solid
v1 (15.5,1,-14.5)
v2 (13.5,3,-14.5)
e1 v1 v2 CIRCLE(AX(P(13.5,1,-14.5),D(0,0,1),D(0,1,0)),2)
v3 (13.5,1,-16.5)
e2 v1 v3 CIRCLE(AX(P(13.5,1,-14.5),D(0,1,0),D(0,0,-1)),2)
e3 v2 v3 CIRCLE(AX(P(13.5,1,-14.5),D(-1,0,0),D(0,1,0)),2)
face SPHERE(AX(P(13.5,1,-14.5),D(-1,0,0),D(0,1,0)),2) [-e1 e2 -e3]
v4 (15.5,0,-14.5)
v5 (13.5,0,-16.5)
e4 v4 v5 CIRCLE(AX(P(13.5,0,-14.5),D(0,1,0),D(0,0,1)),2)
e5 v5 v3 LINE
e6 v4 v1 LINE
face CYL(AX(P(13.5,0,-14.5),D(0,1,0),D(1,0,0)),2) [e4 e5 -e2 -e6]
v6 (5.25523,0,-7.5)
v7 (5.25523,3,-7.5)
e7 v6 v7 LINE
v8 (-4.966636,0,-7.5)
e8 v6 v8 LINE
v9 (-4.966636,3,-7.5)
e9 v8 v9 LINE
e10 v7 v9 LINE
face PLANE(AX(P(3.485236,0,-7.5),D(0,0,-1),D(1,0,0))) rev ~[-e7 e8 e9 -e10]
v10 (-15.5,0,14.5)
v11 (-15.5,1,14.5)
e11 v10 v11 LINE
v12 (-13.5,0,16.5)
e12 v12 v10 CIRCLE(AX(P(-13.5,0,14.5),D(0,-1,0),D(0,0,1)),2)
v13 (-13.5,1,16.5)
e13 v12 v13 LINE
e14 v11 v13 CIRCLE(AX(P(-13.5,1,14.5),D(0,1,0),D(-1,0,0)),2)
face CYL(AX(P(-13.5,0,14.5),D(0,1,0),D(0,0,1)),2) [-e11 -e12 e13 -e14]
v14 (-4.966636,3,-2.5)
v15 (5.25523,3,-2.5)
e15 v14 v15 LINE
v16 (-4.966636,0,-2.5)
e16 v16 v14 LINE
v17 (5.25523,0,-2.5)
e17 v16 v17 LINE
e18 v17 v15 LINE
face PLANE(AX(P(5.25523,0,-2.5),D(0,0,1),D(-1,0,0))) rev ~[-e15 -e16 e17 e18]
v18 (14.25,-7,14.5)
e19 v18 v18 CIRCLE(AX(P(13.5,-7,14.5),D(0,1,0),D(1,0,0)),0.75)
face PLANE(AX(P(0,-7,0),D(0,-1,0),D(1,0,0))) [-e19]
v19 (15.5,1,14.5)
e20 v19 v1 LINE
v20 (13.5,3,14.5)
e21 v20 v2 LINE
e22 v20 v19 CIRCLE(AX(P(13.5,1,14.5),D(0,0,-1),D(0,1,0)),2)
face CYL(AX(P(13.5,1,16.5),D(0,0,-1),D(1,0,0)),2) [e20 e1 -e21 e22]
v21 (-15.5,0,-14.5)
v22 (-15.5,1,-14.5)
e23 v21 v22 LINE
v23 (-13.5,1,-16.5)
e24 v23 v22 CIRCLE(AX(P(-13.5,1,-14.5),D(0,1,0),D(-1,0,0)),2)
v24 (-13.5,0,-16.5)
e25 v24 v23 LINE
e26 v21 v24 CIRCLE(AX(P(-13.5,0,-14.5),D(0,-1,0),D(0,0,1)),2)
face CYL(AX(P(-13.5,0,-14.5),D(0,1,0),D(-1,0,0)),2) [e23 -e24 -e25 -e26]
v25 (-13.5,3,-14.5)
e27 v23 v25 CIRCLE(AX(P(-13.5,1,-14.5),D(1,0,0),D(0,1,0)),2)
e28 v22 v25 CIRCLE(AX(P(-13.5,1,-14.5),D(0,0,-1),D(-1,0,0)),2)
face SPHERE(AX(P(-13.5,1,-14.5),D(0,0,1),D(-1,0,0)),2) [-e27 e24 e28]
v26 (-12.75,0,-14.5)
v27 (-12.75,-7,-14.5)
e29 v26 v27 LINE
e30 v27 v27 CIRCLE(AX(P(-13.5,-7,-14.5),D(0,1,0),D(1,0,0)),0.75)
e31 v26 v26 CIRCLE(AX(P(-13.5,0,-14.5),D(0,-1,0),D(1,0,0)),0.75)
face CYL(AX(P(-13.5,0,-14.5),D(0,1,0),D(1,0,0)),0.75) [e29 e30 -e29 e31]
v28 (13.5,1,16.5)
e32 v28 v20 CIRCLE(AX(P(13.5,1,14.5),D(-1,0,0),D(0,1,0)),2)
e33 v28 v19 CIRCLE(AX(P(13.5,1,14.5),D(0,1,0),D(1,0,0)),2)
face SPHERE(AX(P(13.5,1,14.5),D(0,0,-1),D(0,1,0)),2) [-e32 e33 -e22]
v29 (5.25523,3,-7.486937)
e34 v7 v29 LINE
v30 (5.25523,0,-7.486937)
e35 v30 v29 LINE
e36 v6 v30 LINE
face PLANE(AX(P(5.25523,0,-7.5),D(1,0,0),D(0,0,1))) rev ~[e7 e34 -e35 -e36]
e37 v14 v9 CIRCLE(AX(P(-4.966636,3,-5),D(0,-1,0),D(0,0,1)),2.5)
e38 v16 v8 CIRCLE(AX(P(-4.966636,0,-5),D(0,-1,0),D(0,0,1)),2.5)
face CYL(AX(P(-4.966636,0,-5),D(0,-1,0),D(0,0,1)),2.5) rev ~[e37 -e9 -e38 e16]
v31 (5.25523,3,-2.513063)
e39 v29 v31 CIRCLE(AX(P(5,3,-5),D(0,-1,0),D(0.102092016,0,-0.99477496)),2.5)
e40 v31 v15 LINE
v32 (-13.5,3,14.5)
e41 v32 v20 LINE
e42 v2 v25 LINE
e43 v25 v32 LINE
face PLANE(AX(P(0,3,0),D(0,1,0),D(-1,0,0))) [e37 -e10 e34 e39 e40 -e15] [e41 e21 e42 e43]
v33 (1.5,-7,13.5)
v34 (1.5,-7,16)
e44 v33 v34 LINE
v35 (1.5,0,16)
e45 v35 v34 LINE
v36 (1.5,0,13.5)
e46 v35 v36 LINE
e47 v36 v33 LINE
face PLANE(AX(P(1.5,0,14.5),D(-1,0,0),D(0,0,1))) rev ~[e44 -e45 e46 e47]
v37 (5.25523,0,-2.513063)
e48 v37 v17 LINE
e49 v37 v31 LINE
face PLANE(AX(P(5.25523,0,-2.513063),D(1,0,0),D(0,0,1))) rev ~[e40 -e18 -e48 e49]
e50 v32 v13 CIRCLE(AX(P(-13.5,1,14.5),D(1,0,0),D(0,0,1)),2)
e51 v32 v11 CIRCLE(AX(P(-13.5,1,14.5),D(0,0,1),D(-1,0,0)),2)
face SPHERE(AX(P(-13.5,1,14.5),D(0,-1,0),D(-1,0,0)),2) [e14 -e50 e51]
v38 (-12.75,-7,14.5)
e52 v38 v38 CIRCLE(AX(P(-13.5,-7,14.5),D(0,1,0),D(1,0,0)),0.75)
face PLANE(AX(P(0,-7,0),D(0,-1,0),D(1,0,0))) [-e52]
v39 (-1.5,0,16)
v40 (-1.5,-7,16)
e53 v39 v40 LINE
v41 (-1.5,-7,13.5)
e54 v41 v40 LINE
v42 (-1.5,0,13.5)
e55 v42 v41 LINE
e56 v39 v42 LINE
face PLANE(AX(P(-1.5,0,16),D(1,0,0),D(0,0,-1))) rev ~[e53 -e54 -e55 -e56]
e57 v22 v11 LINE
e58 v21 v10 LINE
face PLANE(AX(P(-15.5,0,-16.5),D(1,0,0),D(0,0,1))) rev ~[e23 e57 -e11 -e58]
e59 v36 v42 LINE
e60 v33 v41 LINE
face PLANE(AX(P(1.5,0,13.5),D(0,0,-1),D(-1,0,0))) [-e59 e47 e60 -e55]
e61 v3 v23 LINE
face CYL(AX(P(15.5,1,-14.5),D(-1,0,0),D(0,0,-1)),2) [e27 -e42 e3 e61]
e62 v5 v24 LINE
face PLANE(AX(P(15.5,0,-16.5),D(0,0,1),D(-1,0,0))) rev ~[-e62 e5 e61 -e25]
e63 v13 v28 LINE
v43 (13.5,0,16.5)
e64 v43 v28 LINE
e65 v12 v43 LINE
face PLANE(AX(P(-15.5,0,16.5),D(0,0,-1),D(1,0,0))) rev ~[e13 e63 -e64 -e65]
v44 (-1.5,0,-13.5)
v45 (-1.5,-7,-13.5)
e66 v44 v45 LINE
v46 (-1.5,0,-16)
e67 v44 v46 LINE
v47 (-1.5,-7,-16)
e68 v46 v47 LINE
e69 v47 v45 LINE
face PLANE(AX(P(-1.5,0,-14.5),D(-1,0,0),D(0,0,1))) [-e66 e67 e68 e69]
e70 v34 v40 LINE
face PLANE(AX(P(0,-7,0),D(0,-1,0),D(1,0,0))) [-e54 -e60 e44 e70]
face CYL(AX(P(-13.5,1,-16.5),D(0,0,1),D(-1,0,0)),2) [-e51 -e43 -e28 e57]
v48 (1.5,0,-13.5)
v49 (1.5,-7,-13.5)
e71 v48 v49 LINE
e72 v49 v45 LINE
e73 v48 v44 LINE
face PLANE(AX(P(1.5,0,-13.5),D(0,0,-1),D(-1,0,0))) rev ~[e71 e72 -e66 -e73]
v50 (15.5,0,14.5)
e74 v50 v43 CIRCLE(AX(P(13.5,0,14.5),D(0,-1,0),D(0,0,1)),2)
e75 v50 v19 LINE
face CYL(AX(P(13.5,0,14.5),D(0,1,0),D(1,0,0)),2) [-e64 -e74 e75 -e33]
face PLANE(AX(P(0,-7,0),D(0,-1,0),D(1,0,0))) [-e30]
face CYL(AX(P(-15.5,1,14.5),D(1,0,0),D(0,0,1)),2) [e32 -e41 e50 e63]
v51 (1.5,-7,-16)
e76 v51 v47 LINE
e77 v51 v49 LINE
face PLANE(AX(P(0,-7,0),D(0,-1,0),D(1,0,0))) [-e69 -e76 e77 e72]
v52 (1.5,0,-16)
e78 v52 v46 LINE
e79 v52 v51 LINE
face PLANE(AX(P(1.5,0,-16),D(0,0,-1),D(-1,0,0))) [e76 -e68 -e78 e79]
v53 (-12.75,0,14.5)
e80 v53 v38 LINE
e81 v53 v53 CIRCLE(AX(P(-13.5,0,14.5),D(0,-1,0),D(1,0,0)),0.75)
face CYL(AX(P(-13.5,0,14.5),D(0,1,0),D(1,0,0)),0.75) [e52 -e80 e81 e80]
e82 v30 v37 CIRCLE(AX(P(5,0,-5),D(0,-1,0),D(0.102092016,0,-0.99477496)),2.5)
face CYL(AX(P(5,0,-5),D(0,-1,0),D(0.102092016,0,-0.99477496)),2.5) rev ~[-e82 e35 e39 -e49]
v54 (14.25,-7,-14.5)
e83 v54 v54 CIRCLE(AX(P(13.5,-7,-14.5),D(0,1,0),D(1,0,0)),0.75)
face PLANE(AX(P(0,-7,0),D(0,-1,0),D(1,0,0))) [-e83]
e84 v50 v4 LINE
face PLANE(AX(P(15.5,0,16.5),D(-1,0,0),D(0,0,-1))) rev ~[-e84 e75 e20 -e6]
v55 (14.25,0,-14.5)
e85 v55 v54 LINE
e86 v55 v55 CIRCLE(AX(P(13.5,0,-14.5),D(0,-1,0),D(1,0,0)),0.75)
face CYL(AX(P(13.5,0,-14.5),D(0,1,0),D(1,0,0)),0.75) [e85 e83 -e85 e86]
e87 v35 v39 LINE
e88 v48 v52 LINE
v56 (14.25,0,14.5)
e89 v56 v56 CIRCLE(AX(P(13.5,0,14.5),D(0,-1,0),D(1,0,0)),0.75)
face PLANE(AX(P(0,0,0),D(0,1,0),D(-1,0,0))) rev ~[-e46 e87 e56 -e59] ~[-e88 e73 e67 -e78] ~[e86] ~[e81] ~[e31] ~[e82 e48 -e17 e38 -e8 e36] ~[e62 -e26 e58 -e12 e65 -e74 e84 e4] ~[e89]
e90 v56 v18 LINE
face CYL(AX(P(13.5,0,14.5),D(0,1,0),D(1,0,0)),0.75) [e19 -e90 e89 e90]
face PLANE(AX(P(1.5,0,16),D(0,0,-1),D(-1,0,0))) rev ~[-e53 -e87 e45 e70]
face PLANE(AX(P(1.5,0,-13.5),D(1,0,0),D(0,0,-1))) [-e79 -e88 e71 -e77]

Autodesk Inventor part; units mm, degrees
ref_plane "YZ Plane" through (0, 0, 0) normal (1, 0, 0) x (0, 1, 0)
ref_plane "XZ Plane" through (0, 0, 0) normal (0, 1, 0) x (-1, 0, 0)
ref_plane "XY Plane" through (0, 0, 0) normal (0, 0, 1) x (1, 0, 0)
sketch "Boceto1" plane through (0, 0, 0) normal (0, 1, 0) x (-1, 0, 0)
  line L0 (15.5, 16.5) -> (-15.5, 16.5)
  line L1 (-15.5, 16.5) -> (-15.5, -16.5)
  line L2 (-15.5, -16.5) -> (15.5, -16.5)
  line L3 (15.5, -16.5) -> (15.5, 16.5)
  line L4 (-15.5, 16.5) -> (15.5, -16.5) construction
  circle A0 centre (15.5, -16.5) radius 0
  line L5 (0, -20.441182) -> (0, -13.180985)
  circle A1 centre (-15.5, -16.5) radius 0
  line L6 (0, 0) -> (-6.703667, 0)
  circle A2 centre (15.5, 16.5) radius 0
  circle A3 centre (-15.5, 16.5) radius 0
  line L7 (-1.743284, -16.5) -> (-1.743284, -13.5)
  line L8 (-1.743284, -13.5) -> (-1.743284, 1.5)
  line L9 (-1.743284, 1.5) -> (-1.743284, 3.5)
  line L10 (-1.743284, 3.5) -> (-1.743284, 13.5)
  line L11 (-1.743284, 13.5) -> (-1.743284, 16.5)
  line L12 (15.5, 0) -> (12.5, 0)
  line L13 (12.5, 0) -> (-12.5, 0)
  line L14 (-12.5, 0) -> (-15.5, 0)
  line L15 (-0.653653, 1.5) -> (-0.653653, -3.5)
  line L16 (12.5, 0) -> (12.5, -5)
  line L17 (12.5, -5) -> (2.466636, -5)
  line L18 (-15.5, 0) -> (-15.5, -5)
  line L19 (-15.5, -5) -> (-12.5, -5)
  circle A4 centre (4.966636, -5) radius 2.5
  line L20 (0, -8.467064) -> (0, -3.5)
  line L21 (12.5, -5) -> (7.5, -5)
  line L22 (12.5, -5) -> (-15.5, -5)
  line L23 (-12.5, -5) -> (-7.5, -5)
  line L24 (-7.5, -5.492671) -> (-7.5, -4.332105)
  line L25 (-7.5, -7.321441) -> (-7.5, -3.5)
  line L26 (-7.5, -5) -> (-3.010459, -5)
  line L27 (-5.25523, -5) -> (-5.25523, -7.5)
  line L28 (-5.25523, -7.5) -> (-3.485236, -7.5)
  line L29 (-5.25523, -5) -> (-5.25523, -2.5)
  line L30 (-5.25523, -2.5) -> (-3.924845, -2.5)
  circle A5 centre (-5, -5) radius 2.5
  line L31 (4.966636, -7.5) -> (-5.25523, -7.5)
  line L32 (-5.25523, -2.5) -> (4.966636, -2.5)
  point P0 (-5.25523, -2.513063)
  point P1 (-5.25523, -7.486937)
  dimension "d0" = 31
  dimension "d1" = 33
  dimension "d3" = 3
  dimension "d4" = 15
  dimension "d5" = 2
  dimension "d6" = 10
  dimension "d7" = 3
  dimension "d8" = 3
  dimension "d9" = 25
  dimension "d10" = 3
  dimension "d11" = 5
  dimension "d12" = 5
  dimension "d14" = 5
  dimension "d15" = 3
  dimension "d16" = 5
  dimension "d17" = 5
  dimension "d19" = 5
  dimension "d21" = 2.5
  dimension "d22" = 2.5
sketch "Boceto1 outline for Extrusión1" plane through (0, 0, 0) normal (0, 1, 0) x (-1, 0, 0)
  line L0 (-15.5, -16.5) -> (15.5, -16.5)
  line L1 (-15.5, 16.5) -> (-15.5, -16.5)
  line L2 (15.5, -16.5) -> (15.5, 16.5)
  line L3 (15.5, 16.5) -> (-15.5, 16.5)
  arc A0 (-5.25523, -7.486937) -> (-5.25523, -2.513063) centre (-5, -5) cw
  line L4 (-5.25523, -7.5) -> (-5.25523, -7.486937)
  line L5 (-3.485236, -7.5) -> (-5.25523, -7.5)
  line L6 (4.966636, -7.5) -> (-3.485236, -7.5)
  arc A1 (4.966636, -2.5) -> (4.966636, -7.5) centre (4.966636, -5) cw
  line L7 (-3.924845, -2.5) -> (4.966636, -2.5)
  line L8 (-5.25523, -2.5) -> (-3.924845, -2.5)
  line L9 (-5.25523, -2.513063) -> (-5.25523, -2.5)
extrude "Extrusión1" add sketch "Boceto1 outline for Extrusión1" along normal blind 3
fillet "Empalme1" radius 2 8 edges at (-15.5, 1.5, 16.5) (-15.5, 3, 0) (-15.5, 1.5, -16.5) (0, 3, -16.5) (15.5, 3, 0) (0, 3, 16.5) (15.5, 1.5, 16.5) (15.5, 1.5, -16.5)
sketch "Boceto2" plane through (0, 0, 0) normal (0, -1, 0) x (1, 0, 0)
  line L0 (-13.5, -14.5) -> (13.5, -14.5)
  circle A0 centre (13.5, -14.5) radius 0.75
  line L1 (0, -0.514663) -> (0, 1.763645)
  circle A1 centre (-13.5, -14.5) radius 0.75
  line L2 (0.998187, 0) -> (-3.186461, 0)
  circle A2 centre (13.5, 14.5) radius 0.75
  circle A3 centre (-13.5, 14.5) radius 0.75
  arc A4 (15.5, 14.5) -> (13.5, 16.5) centre (13.5, 14.5) ccw
  arc A5 (-13.5, 16.5) -> (-15.5, 14.5) centre (-13.5, 14.5) ccw
  arc A6 (-15.5, -14.5) -> (-13.5, -16.5) centre (-13.5, -14.5) ccw
  arc A7 (13.5, -16.5) -> (15.5, -14.5) centre (13.5, -14.5) ccw
  line L3 (-15.5, -14.5) -> (-15.5, 14.5)
  line L4 (-15.5, -14.5) -> (-1.5, -14.5)
  line L5 (-1.5, -14.5) -> (1, -14.5)
  line L6 (13.5, -14.5) -> (13.5, -13.5)
  line L7 (13.5, -14.5) -> (13.5, 14.5)
  line L8 (13.5, -13.5) -> (-13.5, -13.5)
  line L9 (-13.5, 14.5) -> (-13.5, -14.5)
  line L10 (15.5, 14.5) -> (15.5, -14.5)
  line L11 (15.5, -13.5) -> (1.5, -13.5)
  line L12 (-15.5, -13.5) -> (-1.5, -13.5)
  line L13 (1.5, -13.5) -> (1.5, -16)
  line L14 (1.5, -16) -> (-1.5, -16)
  line L15 (-1.5, -16) -> (-1.5, -13.5)
  line L16 (-1.5, 14.5) -> (1, 14.5)
  line L17 (1.5, 13.5) -> (1.5, 16)
  line L18 (1.5, 16) -> (-1.5, 16)
  line L19 (-1.5, 16) -> (-1.5, 13.5)
  line L20 (13.5, 14.5) -> (-13.5, 14.5)
  line L21 (0.770935, 14.5) -> (1.5, 14.5)
  line L22 (-1.5, 16) -> (-1.5, 13.5)
  line L23 (1.5, 13.5) -> (-1.5, 13.5)
  dimension "d26" = 1.5
  dimension "d27" = 14
  dimension "d28" = 2.5
  dimension "d29" = 1
  dimension "d30" = 14
  dimension "d31" = 14
  dimension "d32" = 2.5
extrude "Extrusión2" add sketch "Boceto2" along normal blind 7 contours L9 A1 L0 | L0 A1 L4 | L4 A1 L9 | L15 L8 L13 L0 | L0 L13 L14 L15 | L9 L20 A3 | A3 L20 L9 | A0 L6 L0 | L0 L6 A0 | L19 L18 L17 L20 L16 | L16 L20 L17 L23 L19 | L7 L20 A2 | A2 L20 L7
properties part number "TapaCajaNodoReceptor"
